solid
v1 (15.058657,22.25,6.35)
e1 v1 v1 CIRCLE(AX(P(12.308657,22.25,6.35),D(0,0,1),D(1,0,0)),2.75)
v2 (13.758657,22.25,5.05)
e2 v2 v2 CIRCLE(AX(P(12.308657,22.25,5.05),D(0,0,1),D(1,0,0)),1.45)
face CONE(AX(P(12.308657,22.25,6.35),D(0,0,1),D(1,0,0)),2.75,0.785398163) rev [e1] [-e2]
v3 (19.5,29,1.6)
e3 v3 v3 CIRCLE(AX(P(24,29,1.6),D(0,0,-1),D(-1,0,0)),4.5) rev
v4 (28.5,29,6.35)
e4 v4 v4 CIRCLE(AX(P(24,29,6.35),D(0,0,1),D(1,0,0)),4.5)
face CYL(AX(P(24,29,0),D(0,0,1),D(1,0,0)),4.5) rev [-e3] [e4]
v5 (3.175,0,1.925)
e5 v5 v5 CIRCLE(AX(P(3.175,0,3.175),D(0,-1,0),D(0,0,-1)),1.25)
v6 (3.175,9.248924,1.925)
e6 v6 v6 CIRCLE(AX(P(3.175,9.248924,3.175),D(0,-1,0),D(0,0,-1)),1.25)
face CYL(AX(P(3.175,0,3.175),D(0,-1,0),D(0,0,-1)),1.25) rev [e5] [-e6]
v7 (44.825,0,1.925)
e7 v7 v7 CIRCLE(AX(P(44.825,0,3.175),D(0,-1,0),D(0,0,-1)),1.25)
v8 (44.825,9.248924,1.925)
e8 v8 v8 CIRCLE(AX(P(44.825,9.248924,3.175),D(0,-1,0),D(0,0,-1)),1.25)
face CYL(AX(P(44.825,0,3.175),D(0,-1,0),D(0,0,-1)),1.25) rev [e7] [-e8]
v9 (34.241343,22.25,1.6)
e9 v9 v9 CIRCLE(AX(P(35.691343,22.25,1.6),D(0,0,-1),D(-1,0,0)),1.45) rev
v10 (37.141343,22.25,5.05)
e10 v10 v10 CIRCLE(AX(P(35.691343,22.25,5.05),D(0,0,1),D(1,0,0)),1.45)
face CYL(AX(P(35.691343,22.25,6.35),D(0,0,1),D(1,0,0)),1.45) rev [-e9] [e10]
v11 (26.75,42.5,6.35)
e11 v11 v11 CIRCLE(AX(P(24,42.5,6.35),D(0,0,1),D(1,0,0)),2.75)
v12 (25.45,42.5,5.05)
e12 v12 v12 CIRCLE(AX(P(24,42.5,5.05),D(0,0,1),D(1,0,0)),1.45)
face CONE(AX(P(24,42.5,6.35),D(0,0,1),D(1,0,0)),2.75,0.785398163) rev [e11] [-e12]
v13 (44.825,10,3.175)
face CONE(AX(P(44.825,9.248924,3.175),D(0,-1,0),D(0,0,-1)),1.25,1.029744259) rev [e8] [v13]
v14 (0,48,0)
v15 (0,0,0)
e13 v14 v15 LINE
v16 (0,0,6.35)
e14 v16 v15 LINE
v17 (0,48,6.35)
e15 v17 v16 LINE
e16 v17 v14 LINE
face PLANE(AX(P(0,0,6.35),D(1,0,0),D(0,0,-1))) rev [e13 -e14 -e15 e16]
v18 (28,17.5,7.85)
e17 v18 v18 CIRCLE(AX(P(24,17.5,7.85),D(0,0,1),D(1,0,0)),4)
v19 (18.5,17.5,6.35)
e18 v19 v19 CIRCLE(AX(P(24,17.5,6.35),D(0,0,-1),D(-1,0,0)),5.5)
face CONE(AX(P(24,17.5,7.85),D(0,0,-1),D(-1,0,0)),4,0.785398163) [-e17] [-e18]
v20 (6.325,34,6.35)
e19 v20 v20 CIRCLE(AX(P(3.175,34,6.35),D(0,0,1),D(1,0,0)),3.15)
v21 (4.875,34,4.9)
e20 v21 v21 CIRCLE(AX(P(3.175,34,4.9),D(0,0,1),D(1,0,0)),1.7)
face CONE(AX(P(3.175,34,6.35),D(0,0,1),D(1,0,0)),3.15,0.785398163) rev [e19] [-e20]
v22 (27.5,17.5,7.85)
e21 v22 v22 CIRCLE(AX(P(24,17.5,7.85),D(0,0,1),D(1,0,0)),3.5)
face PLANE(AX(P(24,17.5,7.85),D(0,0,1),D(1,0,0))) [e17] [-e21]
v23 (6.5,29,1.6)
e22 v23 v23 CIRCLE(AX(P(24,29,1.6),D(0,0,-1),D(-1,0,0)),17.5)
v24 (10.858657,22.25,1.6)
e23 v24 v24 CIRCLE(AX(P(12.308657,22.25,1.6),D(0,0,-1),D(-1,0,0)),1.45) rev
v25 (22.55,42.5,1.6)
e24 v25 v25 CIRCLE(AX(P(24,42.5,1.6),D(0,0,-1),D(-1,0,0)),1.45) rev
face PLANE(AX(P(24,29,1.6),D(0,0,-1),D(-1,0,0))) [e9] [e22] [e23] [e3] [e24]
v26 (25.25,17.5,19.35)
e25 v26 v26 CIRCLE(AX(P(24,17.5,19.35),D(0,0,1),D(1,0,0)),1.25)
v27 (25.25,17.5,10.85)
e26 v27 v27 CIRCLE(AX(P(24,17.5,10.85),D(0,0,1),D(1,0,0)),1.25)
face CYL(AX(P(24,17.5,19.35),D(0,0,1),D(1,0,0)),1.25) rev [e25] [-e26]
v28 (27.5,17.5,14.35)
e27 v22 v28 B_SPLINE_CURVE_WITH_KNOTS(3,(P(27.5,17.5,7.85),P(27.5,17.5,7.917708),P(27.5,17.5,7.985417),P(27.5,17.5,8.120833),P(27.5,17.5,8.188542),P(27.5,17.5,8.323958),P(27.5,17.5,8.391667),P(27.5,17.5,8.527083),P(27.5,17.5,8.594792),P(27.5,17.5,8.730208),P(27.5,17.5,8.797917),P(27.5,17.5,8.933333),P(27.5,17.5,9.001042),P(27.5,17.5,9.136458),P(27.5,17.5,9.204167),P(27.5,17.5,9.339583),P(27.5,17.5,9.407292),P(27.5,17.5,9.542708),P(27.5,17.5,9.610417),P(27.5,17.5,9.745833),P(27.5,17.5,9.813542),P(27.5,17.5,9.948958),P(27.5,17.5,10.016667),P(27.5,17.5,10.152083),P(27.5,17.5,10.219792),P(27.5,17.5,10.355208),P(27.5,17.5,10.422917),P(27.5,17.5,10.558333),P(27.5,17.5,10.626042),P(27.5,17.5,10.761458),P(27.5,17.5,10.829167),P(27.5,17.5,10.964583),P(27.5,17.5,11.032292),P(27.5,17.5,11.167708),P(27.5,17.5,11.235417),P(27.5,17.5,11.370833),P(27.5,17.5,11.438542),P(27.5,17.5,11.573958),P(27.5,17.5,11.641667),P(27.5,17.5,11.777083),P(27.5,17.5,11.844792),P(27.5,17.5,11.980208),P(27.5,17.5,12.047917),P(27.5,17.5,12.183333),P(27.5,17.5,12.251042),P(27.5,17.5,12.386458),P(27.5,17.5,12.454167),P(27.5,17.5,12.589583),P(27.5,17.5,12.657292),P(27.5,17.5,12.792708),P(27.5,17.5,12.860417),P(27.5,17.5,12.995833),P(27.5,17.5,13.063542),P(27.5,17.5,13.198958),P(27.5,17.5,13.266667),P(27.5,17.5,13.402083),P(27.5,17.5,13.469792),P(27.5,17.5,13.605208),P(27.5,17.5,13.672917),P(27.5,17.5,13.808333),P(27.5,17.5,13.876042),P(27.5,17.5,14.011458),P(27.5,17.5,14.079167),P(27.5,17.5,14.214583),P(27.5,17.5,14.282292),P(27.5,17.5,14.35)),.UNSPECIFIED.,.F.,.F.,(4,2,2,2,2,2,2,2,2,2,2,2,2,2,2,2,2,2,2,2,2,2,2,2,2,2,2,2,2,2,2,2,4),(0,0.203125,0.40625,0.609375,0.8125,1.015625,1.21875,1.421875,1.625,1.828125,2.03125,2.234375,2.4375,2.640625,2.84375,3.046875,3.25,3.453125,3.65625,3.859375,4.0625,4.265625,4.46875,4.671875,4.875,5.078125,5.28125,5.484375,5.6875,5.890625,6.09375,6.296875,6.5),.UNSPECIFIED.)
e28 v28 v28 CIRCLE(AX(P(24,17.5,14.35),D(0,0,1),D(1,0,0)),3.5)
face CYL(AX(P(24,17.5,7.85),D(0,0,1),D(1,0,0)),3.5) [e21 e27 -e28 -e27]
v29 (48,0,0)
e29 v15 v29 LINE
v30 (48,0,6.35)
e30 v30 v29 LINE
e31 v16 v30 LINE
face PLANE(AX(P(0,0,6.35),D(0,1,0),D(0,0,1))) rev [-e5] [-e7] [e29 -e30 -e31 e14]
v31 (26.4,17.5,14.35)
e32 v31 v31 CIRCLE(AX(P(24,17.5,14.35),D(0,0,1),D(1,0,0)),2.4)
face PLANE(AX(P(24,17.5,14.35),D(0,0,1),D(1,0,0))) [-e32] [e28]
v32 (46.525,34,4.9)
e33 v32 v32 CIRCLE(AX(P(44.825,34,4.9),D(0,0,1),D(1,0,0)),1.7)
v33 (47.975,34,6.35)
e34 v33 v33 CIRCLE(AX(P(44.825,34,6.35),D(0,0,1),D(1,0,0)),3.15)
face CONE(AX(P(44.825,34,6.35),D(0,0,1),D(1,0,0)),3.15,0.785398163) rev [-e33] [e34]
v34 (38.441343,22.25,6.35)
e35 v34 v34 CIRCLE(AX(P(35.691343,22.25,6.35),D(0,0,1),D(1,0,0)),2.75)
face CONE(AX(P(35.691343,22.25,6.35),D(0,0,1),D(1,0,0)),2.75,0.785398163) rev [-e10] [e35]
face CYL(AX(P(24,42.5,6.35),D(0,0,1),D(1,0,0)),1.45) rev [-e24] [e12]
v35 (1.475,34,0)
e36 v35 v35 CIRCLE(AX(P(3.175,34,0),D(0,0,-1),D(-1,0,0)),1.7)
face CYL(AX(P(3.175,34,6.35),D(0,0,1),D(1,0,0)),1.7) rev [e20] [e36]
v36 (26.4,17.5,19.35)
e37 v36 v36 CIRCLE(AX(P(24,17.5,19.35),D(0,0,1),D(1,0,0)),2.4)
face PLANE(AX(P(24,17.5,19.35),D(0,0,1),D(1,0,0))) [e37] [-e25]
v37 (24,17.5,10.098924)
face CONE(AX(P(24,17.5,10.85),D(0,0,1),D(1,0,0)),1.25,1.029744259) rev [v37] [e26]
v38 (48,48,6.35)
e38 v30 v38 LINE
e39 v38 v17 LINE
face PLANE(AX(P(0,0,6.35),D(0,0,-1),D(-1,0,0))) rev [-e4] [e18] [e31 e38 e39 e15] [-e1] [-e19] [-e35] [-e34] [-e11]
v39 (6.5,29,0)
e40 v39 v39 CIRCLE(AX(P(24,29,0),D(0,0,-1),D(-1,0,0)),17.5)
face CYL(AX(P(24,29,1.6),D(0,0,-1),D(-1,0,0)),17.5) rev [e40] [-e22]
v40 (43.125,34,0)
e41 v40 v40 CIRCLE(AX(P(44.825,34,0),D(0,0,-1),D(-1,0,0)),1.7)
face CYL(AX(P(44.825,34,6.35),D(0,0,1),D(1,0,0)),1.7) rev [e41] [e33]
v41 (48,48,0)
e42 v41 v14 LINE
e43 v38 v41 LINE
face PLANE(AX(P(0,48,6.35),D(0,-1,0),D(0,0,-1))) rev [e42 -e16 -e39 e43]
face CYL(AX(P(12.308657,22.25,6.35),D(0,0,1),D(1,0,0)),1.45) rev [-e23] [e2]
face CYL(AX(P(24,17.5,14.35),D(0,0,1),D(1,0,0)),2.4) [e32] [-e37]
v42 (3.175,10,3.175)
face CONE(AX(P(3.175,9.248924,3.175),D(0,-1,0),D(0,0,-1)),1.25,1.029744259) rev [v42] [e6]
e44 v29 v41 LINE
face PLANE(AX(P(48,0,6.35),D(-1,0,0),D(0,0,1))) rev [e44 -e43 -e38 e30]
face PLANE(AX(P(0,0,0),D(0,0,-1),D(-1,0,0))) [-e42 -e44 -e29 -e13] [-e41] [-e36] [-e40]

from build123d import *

# Parameters (mm, degrees)
ESBO_O1_W                                            = 48
ESBO_O1_H                                            = 48
RESSALTO_EXTRUS_O1_DEPTH                             = 6.35
ESBO_O3_R                                            = 6
RESSALTO_EXTRUS_O2_DEPTH                             = 13
CORTE_EXTRUS_O1_START                                = -5
ESBO_O4_R                                            = 6
ESBO_O4_R_2                                          = 2.4
CORTE_EXTRUS_O1_DEPTH                                = 5
CORTE_EXTRUS_O2_START                                = -6.5
ESBO_O5_R                                            = 6
ESBO_O5_R_2                                          = 3.5
CORTE_EXTRUS_O2_DEPTH                                = 6.5
FURO_ROSCADO_DE_M31_D                                = 2.5
FURO_ROSCADO_DE_M31_DEPTH                            = 8.5
FURO_ROSCADO_DE_M31_TIP                              = 0.751075774
ESCAREADO_PARA_PARAFUSO_COM_CABE_A_ESCAR_D           = 3.4
ESCAREADO_PARA_PARAFUSO_COM_CABE_A_ESCAR_DEPTH       = 10.778536948
ESCAREADO_PARA_PARAFUSO_COM_CABE_A_ESCAR_CSINK_D     = 6.3
ESCAREADO_PARA_PARAFUSO_COM_CABE_A_ESCAR_CSINK_ANGLE = 90
ESCAREADO_PARA_PARAFUSO_COM_CABE_A_ESCAR_TIP         = 1.021463052
FURO_ROSCADO_DE_M32_D                                = 2.5
FURO_ROSCADO_DE_M32_DEPTH                            = 9.248924226
FURO_ROSCADO_DE_M32_TIP                              = 0.751075774
CHANFRO4_SIZE                                        = 2
ESBO_O29_R                                           = 4.5
CORTE_EXTRUS_O3_DEPTH                                = 70.115844783
ESCAREADO_PARA_PARAFUSO_COM_CABE_A_E_2_D             = 2.9
ESCAREADO_PARA_PARAFUSO_COM_CABE_A_E_2_CSINK_D       = 5.5
ESCAREADO_PARA_PARAFUSO_COM_CABE_A_E_2_CSINK_ANGLE   = 90
ESBO_O32_R                                           = 17.5
CORTE_EXTRUS_O4_DEPTH                                = 1.6


with BuildPart() as part:
    # Esboço1 → Ressalto-extrusão1 (new body)
    with BuildSketch(Plane.XY):
        with Locations((24, 24)):
            Rectangle(ESBO_O1_W, ESBO_O1_H)
    extrude(amount=RESSALTO_EXTRUS_O1_DEPTH)

    # Esboço3 → Ressalto-extrusão2 (add)
    with BuildSketch(Plane.XY.offset(6.35)):
        with Locations(Location((24, 17.5, 0), (0, 0, 180))):
            Circle(ESBO_O3_R)
    extrude(amount=RESSALTO_EXTRUS_O2_DEPTH)

    # Esboço4 → Corte-extrusão1 (cut)
    with BuildSketch(Plane.XY.offset(19.35).offset(CORTE_EXTRUS_O1_START)):
        with Locations(Location((24, 17.5, 0), (0, 0, 180))):
            Circle(ESBO_O4_R)
        with Locations((24, 17.5)):
            Circle(ESBO_O4_R_2, mode=Mode.SUBTRACT)
    extrude(amount=CORTE_EXTRUS_O1_DEPTH, mode=Mode.SUBTRACT)

    # Esboço5 → Corte-extrusão2 (cut)
    with BuildSketch(Plane.XY.offset(14.35).offset(CORTE_EXTRUS_O2_START)):
        with Locations(Location((24, 17.5, 0), (0, 0, 180))):
            Circle(ESBO_O5_R)
        with Locations((24, 17.5)):
            Circle(ESBO_O5_R_2, mode=Mode.SUBTRACT)
    extrude(amount=CORTE_EXTRUS_O2_DEPTH, mode=Mode.SUBTRACT)

    # Furo roscado de M31
    with Locations(Plane(origin=(24, 17.5, 19.35), x_dir=(1, 0, 0), z_dir=(0, 0, 1))):
        with Locations((0, 0)):
            Hole(FURO_ROSCADO_DE_M31_D / 2, depth=FURO_ROSCADO_DE_M31_DEPTH)
            with Locations((0, 0, -(FURO_ROSCADO_DE_M31_DEPTH + FURO_ROSCADO_DE_M31_TIP / 2))):  # 118° drill point
                Cone(0, FURO_ROSCADO_DE_M31_D / 2, FURO_ROSCADO_DE_M31_TIP, mode=Mode.SUBTRACT)

    # Escareado para parafuso com cabe_a escar
    with Locations(Plane(origin=(44.825, 34, 6.35), x_dir=(1, 0, 0), z_dir=(0, 0, 1))):
        with Locations((0, 0), (-41.65, 0)):
            CounterSinkHole(ESCAREADO_PARA_PARAFUSO_COM_CABE_A_ESCAR_D / 2, ESCAREADO_PARA_PARAFUSO_COM_CABE_A_ESCAR_CSINK_D / 2, depth=ESCAREADO_PARA_PARAFUSO_COM_CABE_A_ESCAR_DEPTH, counter_sink_angle=ESCAREADO_PARA_PARAFUSO_COM_CABE_A_ESCAR_CSINK_ANGLE)
            with Locations((0, 0, -(ESCAREADO_PARA_PARAFUSO_COM_CABE_A_ESCAR_DEPTH + ESCAREADO_PARA_PARAFUSO_COM_CABE_A_ESCAR_TIP / 2))):  # 118° drill point
                Cone(0, ESCAREADO_PARA_PARAFUSO_COM_CABE_A_ESCAR_D / 2, ESCAREADO_PARA_PARAFUSO_COM_CABE_A_ESCAR_TIP, mode=Mode.SUBTRACT)

    # Furo roscado de M32
    with Locations(Plane(origin=(3.175, 0, 3.175), x_dir=(0, 0, -1), z_dir=(0, -1, 0))):
        with Locations((0, 0), (0, 41.65)):
            Hole(FURO_ROSCADO_DE_M32_D / 2, depth=FURO_ROSCADO_DE_M32_DEPTH)
            with Locations((0, 0, -(FURO_ROSCADO_DE_M32_DEPTH + FURO_ROSCADO_DE_M32_TIP / 2))):  # 118° drill point
                Cone(0, FURO_ROSCADO_DE_M32_D / 2, FURO_ROSCADO_DE_M32_TIP, mode=Mode.SUBTRACT)

    # Chanfro4
    # the kernel refuses this chamfer: 2 mm, written as the material it takes off along each edge
    with BuildSketch(Plane(origin=(24, 17.5, 7.85), x_dir=(-1, 0, 0), z_dir=(0, 1, 0))) as chanfro4_piece_1_section:
        Polygon((6, -CHANFRO4_SIZE), (6 - CHANFRO4_SIZE, 0), (6, 0), align=None)
    chanfro4_piece_1 = revolve(axis=Axis((24, 17.5, 7.85), (0, 0, 1)), mode=Mode.PRIVATE)
    chanfro4_piece_1 = split(chanfro4_piece_1, bisect_by=Plane(origin=(28.750537315, 17.5, 6.35), z_dir=(0, 0, 1)), keep=Keep.TOP, mode=Mode.PRIVATE)
    add(chanfro4_piece_1, mode=Mode.SUBTRACT)

    # Esboço29 → Corte-extrusão3 (cut, through all)
    with BuildSketch(Plane.XY.offset(6.35)):
        with Locations((24, 29)):
            Circle(ESBO_O29_R)
    extrude(amount=-CORTE_EXTRUS_O3_DEPTH, mode=Mode.SUBTRACT)

    # Escareado para parafuso com cabe_a e 2 (through all)
    with Locations(Plane(origin=(12.308657049, 22.25, 6.35), x_dir=(1, 0, 0), z_dir=(0, 0, 1))):
        with Locations((0, 0), (23.382685902, 0), (11.691342951, 20.25)):
            CounterSinkHole(ESCAREADO_PARA_PARAFUSO_COM_CABE_A_E_2_D / 2, ESCAREADO_PARA_PARAFUSO_COM_CABE_A_E_2_CSINK_D / 2, counter_sink_angle=ESCAREADO_PARA_PARAFUSO_COM_CABE_A_E_2_CSINK_ANGLE)

    # Esboço32 → Corte-extrusão4 (cut)
    with BuildSketch(Plane(origin=(0, 0, 0), x_dir=(-1, 0, 0), z_dir=(0, 0, -1))):
        with Locations((-24, 29)):
            Circle(ESBO_O32_R)
    extrude(amount=-CORTE_EXTRUS_O4_DEPTH, mode=Mode.SUBTRACT)


solid = part.part
